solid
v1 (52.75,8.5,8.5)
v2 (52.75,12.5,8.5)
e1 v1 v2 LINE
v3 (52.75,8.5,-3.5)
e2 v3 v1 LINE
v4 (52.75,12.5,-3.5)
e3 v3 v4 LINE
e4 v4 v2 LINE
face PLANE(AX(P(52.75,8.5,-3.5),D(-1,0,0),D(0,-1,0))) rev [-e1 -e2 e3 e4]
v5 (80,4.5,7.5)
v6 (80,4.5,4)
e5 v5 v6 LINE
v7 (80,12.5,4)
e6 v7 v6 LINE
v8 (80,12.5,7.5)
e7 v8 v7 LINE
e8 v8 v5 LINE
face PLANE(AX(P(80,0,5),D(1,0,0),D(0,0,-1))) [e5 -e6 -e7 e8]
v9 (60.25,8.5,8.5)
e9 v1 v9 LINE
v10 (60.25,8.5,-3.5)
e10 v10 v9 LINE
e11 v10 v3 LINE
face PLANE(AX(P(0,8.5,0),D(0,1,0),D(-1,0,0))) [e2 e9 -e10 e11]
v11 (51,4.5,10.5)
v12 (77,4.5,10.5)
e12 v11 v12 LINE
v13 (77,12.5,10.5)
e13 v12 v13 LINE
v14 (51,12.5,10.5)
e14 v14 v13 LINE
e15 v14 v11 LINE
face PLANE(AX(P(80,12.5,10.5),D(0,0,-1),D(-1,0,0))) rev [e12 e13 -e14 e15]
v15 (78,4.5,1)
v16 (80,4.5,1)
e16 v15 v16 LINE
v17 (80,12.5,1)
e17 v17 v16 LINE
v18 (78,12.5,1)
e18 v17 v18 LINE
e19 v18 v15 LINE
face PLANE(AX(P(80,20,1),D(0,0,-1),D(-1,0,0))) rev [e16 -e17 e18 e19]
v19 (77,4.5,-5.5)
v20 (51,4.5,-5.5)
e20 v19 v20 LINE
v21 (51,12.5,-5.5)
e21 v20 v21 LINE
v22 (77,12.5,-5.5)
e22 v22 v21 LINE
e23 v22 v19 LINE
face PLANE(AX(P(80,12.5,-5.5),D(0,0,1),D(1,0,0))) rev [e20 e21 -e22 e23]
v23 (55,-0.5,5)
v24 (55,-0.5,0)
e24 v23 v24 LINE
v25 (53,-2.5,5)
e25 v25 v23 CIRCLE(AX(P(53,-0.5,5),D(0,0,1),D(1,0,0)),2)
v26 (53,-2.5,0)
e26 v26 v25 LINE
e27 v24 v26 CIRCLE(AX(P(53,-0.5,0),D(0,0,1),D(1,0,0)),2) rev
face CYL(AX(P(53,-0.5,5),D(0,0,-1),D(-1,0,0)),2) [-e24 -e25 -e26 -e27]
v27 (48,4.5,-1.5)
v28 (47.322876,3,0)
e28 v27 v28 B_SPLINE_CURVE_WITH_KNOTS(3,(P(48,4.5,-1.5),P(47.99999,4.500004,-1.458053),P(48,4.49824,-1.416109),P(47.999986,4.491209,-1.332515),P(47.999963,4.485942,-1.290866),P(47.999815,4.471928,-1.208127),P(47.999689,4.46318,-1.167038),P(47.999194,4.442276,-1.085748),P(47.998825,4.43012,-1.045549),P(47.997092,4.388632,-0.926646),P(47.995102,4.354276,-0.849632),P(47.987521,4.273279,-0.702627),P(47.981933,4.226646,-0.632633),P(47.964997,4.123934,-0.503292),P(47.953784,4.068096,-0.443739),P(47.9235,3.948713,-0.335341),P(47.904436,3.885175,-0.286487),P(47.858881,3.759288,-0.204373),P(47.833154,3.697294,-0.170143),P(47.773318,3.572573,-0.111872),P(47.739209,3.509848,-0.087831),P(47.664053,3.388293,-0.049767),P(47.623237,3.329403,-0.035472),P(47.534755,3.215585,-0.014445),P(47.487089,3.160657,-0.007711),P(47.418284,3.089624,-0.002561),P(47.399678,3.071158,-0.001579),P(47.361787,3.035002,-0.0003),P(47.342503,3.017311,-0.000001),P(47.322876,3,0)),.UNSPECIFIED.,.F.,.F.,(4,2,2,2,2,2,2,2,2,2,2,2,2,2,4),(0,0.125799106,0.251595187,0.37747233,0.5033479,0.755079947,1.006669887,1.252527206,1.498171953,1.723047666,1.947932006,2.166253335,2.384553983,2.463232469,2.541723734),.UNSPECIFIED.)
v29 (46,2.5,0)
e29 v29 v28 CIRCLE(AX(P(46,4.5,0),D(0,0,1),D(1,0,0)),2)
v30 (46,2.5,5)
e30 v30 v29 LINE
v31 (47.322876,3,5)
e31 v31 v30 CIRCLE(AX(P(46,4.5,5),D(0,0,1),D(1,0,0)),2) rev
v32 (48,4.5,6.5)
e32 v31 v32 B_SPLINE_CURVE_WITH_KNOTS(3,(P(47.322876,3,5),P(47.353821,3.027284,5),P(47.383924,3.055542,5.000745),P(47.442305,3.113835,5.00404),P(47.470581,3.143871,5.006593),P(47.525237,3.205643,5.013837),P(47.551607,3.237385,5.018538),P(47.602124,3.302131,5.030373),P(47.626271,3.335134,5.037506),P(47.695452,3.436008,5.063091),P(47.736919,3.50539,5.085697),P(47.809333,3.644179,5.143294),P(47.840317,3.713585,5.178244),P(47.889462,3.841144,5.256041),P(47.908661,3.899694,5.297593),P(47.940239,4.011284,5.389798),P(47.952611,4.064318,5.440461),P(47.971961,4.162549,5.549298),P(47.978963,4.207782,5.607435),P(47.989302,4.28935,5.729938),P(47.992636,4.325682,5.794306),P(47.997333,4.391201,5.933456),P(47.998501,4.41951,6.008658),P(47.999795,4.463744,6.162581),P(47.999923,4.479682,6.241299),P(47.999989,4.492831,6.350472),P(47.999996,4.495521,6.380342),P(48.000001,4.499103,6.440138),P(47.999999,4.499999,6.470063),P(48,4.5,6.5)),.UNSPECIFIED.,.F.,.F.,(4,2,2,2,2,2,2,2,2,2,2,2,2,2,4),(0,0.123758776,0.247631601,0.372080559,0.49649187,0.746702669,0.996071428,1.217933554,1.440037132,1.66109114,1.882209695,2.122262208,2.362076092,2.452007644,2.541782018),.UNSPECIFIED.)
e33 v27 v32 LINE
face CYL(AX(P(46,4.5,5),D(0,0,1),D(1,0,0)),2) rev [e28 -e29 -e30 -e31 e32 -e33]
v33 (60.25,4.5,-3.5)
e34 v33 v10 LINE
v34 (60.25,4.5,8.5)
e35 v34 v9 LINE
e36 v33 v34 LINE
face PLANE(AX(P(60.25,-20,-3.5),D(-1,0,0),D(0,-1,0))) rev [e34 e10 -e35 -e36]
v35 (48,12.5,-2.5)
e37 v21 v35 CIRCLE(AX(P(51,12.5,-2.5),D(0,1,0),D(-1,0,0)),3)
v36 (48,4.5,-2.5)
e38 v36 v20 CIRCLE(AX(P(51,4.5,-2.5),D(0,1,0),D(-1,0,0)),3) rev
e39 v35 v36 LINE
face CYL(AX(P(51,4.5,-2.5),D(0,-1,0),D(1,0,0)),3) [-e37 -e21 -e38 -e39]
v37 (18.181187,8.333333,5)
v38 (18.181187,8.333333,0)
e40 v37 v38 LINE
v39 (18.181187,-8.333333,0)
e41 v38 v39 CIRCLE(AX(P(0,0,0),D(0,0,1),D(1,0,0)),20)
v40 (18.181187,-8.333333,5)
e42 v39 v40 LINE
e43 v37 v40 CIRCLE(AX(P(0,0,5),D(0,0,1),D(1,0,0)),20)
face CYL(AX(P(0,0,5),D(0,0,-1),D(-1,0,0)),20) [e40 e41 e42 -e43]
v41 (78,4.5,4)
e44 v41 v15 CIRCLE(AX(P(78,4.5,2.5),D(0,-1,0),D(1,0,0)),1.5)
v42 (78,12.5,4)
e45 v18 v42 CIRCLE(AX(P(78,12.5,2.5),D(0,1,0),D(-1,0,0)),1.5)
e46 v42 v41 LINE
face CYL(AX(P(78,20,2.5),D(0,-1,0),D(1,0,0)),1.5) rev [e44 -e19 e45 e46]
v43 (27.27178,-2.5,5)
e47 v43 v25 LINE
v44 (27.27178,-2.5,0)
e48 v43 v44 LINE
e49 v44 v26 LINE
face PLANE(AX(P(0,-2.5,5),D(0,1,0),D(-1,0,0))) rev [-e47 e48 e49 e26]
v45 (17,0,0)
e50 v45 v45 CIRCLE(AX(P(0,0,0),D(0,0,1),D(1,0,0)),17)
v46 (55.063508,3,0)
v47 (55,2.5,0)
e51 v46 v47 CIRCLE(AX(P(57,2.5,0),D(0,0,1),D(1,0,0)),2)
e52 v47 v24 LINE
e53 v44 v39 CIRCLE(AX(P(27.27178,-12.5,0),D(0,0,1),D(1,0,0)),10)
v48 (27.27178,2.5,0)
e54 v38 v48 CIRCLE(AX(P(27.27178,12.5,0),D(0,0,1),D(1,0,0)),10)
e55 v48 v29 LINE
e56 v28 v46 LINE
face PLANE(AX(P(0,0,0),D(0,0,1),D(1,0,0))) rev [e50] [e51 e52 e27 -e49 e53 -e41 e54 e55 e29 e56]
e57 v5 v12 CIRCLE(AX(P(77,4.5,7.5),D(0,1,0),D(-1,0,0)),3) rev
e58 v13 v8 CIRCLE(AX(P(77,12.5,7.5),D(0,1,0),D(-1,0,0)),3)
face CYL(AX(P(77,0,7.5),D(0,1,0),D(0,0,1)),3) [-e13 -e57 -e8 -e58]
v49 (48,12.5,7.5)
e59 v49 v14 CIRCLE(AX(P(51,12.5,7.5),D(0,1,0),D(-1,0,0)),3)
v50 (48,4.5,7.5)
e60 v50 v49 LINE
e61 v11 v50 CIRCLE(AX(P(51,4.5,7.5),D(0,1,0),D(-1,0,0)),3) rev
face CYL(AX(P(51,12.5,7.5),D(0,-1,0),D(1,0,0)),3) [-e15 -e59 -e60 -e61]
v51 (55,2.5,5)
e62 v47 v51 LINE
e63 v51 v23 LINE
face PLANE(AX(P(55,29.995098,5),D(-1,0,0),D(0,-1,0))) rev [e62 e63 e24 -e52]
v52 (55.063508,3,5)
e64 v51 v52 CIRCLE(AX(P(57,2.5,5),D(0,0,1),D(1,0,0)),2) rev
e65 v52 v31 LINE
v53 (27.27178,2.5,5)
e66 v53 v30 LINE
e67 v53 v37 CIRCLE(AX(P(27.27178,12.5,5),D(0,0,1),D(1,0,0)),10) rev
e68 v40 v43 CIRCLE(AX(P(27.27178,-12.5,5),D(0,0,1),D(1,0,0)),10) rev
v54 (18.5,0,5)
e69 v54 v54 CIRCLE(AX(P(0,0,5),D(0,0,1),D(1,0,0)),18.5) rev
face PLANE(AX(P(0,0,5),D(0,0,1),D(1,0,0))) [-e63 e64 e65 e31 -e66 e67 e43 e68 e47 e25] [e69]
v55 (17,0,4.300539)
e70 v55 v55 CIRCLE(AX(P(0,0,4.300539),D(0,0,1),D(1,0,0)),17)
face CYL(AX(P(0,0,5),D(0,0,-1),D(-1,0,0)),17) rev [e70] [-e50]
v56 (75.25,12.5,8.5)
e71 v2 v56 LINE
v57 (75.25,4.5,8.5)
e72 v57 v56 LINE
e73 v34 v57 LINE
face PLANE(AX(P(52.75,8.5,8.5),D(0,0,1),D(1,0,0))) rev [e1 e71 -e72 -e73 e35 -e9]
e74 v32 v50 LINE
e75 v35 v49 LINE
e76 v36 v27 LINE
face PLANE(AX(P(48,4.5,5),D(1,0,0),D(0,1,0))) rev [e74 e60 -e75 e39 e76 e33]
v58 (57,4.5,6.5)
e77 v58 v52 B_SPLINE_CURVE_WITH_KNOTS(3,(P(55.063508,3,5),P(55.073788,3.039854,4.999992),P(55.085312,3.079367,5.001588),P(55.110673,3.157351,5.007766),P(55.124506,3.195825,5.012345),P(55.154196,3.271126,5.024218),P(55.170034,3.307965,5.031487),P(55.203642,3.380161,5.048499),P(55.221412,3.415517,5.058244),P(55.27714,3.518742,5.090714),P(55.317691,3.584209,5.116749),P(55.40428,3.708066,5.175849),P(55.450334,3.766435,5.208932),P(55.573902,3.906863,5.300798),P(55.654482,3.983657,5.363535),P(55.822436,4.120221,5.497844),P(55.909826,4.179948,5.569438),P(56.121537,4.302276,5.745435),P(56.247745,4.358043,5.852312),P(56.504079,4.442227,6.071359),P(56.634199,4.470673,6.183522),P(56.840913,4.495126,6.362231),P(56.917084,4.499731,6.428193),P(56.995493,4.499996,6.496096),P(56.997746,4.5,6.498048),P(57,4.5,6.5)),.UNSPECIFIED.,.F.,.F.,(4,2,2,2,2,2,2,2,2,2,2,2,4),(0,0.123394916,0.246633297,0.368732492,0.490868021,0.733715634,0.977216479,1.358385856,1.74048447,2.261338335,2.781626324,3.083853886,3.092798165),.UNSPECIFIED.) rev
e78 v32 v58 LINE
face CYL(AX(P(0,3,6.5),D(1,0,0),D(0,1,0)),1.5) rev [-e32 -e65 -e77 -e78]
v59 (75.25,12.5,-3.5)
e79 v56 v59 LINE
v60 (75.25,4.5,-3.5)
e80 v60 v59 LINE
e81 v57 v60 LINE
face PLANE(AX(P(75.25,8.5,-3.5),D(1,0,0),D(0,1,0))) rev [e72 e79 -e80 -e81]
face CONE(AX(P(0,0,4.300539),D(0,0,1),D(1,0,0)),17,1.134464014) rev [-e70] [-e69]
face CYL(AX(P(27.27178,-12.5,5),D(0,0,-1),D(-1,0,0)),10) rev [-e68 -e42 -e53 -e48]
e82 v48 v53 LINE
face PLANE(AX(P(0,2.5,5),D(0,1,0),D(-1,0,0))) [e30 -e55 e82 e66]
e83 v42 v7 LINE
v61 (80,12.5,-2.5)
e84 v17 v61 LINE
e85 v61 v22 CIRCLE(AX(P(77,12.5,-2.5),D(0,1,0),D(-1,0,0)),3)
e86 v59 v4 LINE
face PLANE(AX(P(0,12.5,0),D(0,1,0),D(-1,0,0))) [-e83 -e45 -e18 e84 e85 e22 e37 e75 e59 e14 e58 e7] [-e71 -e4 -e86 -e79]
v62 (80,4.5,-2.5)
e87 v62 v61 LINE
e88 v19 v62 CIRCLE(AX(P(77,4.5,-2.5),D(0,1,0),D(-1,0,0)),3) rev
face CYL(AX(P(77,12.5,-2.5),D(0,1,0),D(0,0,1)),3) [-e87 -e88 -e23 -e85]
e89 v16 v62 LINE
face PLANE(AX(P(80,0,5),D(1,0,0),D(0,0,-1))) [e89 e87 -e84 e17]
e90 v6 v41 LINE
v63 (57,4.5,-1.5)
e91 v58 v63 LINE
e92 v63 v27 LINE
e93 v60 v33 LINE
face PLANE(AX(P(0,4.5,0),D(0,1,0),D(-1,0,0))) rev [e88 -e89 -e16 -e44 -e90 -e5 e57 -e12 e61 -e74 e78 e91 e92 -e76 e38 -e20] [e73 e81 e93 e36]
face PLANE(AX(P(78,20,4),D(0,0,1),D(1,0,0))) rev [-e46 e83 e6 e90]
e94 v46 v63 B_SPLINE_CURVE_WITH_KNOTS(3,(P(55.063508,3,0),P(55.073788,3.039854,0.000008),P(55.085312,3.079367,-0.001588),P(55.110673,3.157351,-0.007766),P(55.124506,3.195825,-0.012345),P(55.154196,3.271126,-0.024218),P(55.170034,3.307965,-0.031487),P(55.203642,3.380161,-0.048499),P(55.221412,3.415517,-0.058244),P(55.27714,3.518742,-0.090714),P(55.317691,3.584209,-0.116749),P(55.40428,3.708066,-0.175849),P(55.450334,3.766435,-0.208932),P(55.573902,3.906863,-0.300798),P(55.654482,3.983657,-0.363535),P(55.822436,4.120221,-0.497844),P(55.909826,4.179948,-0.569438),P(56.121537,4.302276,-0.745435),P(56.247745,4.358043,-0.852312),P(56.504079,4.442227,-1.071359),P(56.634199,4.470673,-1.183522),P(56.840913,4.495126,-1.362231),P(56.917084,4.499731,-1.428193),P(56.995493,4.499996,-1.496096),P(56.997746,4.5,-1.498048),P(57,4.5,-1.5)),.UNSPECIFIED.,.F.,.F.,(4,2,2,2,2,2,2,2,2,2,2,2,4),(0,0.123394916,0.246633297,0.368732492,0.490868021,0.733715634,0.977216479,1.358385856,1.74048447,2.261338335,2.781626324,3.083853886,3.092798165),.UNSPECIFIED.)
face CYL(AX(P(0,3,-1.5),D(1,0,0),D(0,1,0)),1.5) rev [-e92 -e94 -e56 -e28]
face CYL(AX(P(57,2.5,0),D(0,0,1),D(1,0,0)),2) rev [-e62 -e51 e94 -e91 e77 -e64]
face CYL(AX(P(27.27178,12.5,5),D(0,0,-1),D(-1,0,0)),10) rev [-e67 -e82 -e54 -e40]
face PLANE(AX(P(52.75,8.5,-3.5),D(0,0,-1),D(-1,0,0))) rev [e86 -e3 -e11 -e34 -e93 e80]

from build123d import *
from build123d.topology import SkipClean

# Parameters (mm, degrees)
BOSS_EXTRUDE1_DEPTH = 5
CHAMFER2_SIZE       = 1.5
CHAMFER2_SIZE2      = 0.699461487
FILLET1_R           = 10
SKETCH10_W          = 32
SKETCH10_H          = 5
BOSS_EXTRUDE3_DEPTH = 2
SKETCH5_W           = 32
SKETCH5_H           = 16
BOSS_EXTRUDE2_DEPTH = 8
SKETCH6_W           = 22.5
SKETCH6_H           = 12
CUT_EXTRUDE1_DEPTH  = 4
SKETCH7_W           = 25
SKETCH7_H           = 5
CUT_EXTRUDE2_DEPTH  = 7
SKETCH8_W           = 15
SKETCH8_H           = 12
CUT_EXTRUDE3_DEPTH  = 86.571607441
CUT_EXTRUDE4_DEPTH  = 85.32378075
FILLET2_R           = 2
FILLET3_START       = 48
FILLET3_DEPTH       = 6.9999999
FILLET3_START_2     = 47.322875556
FILLET3_2_DEPTH     = 9.677124544
FILLET3_START_3     = -3
FILLET3_3_DEPTH     = 10
FILLET4_R           = 3


with BuildPart() as part:
    # Sketch1 → Boss-Extrude1 (new body)
    with BuildSketch(Plane.XY):
        with BuildLine():
            ThreePointArc((16.815171721, -2.5), (-17, 0), (16.815171721, 2.5))
            Line((16.815171721, 2.5), (19.843134833, 2.5))
            ThreePointArc((19.843134833, 2.5), (-20, 0), (19.843134833, -2.5))
            Line((19.843134833, -2.5), (16.815171721, -2.5))
        make_face()
        with BuildLine():
            Line((19.843134833, 2.5), (16.815171721, 2.5))
            ThreePointArc((16.815171721, 2.5), (16.953729962, 1.253411494), (17, 0))
            ThreePointArc((17, 0), (16.953729962, -1.253411494), (16.815171721, -2.5))
            Line((16.815171721, -2.5), (19.843134833, -2.5))
            ThreePointArc((19.843134833, -2.5), (19.960745185, -1.252458251), (20, 0))
            ThreePointArc((20, 0), (19.960745185, 1.252458251), (19.843134833, 2.5))
        make_face()
        with BuildLine():
            Line((80, 2.5), (19.843134833, 2.5))
            ThreePointArc((19.843134833, 2.5), (19.960745185, 1.252458251), (20, 0))
            ThreePointArc((20, 0), (19.960745185, -1.252458251), (19.843134833, -2.5))
            Line((19.843134833, -2.5), (80, -2.5))
            Line((80, -2.5), (80, 2.5))
        make_face()
    extrude(amount=BOSS_EXTRUDE1_DEPTH)

    # Chamfer2
    chamfer2_edges = [part.edges().sort_by_distance(p)[0] for p in [
        (-16.815171721, -2.5, 5),
    ]]
    chamfer2_side = [part.faces().sort_by_distance(p)[0] for p in [
        (23.12129627, 0, 5),
    ]]
    chamfer(chamfer2_edges, length=CHAMFER2_SIZE, length2=CHAMFER2_SIZE2, reference=chamfer2_side[0])

    # Fillet1
    fillet1_edges = [part.edges().sort_by_distance(p)[0] for p in [
        (19.843134833, 2.5, 2.5),
        (19.843134833, -2.5, 2.5),
    ]]
    fillet(fillet1_edges, radius=FILLET1_R)

    # Sketch10 → Boss-Extrude3 (add)
    with BuildSketch(Plane(origin=(0, 2.5, 0), x_dir=(1, 0, 0), z_dir=(0, 1, 0))):
        with Locations((64, -2.5)):
            Rectangle(SKETCH10_W, SKETCH10_H)
    extrude(amount=BOSS_EXTRUDE3_DEPTH)

    # Sketch5 → Boss-Extrude2 (add)
    with BuildSketch(Plane(origin=(0, 4.5, 0), x_dir=(1, 0, 0), z_dir=(0, 1, 0))):
        with Locations((64, -2.5)):
            Rectangle(SKETCH5_W, SKETCH5_H)
    extrude(amount=BOSS_EXTRUDE2_DEPTH)

    # Sketch6 → Cut-Extrude1 (cut)
    with BuildSketch(Plane(origin=(0, 12.5, 0), x_dir=(1, 0, 0), z_dir=(0, 1, 0))):
        with Locations((64, -2.5)):
            Rectangle(SKETCH6_W, SKETCH6_H)
    extrude(amount=-CUT_EXTRUDE1_DEPTH, mode=Mode.SUBTRACT)

    # Sketch7 → Cut-Extrude2 (cut)
    with BuildSketch(Plane.XZ.offset(2.5)):
        with Locations((67.5, 2.5)):
            Rectangle(SKETCH7_W, SKETCH7_H)
    extrude(amount=-CUT_EXTRUDE2_DEPTH, mode=Mode.SUBTRACT)

    # Sketch8 → Cut-Extrude3 (cut, through all)
    with BuildSketch(Plane(origin=(0, 8.5, 0), x_dir=(1, 0, 0), z_dir=(0, 1, 0))):
        with Locations((67.75, -2.5)):
            Rectangle(SKETCH8_W, SKETCH8_H)
    extrude(amount=-CUT_EXTRUDE3_DEPTH, mode=Mode.SUBTRACT)

    # Sketch9 → Cut-Extrude4 (cut, through all)
    with BuildSketch(Plane.XZ.offset(-4.5)):
        with BuildLine():
            Line((78, 4), (80, 4))
            Line((80, 4), (80, 1))
            Line((80, 1), (78, 1))
            ThreePointArc((78, 1), (76.5, 2.5), (78, 4))
        make_face()
    extrude(amount=-CUT_EXTRUDE4_DEPTH, mode=Mode.SUBTRACT)

    # Fillet2
    fillet2_edges = [part.edges().sort_by_distance(p)[0] for p in [
        (55, 4.5, 2.5),
        (48, 2.5, 2.5),
        (55, -2.5, 2.5),
    ]]
    fillet(fillet2_edges, radius=FILLET2_R)

    # Fillet3: read off the stored shape, not the designer's step
    # Fillet3 outline → Fillet3 (add)
    with BuildSketch(Plane.YZ.offset(FILLET3_START)):
        with BuildLine():
            Line((4.5, -1.5), (4.5, 0))
            Line((4.5, 0), (3, 0))
            ThreePointArc((3, 0), (4.060660172, -0.439339828), (4.5, -1.5))
        make_face()
        with BuildLine():
            ThreePointArc((4.5, 6.5), (4.060660172, 5.439339828), (3, 5))
            Line((3, 5), (4.5, 5))
            Line((4.5, 5), (4.5, 6.5))
        make_face()
    extrude(amount=FILLET3_DEPTH)

    # Fillet3 2 outline → Fillet3 2 (add)
    with BuildSketch(Plane.YZ.offset(FILLET3_START_2)):
        with BuildLine():
            Line((4.5, -1.5), (4.5, 0))
            Line((4.5, 0), (3, 0))
            ThreePointArc((3, 0), (4.060660172, -0.439339828), (4.5, -1.5))
        make_face()
        with BuildLine():
            ThreePointArc((4.5, 6.5), (4.060660172, 5.439339828), (3, 5))
            Line((3, 5), (4.5, 5))
            Line((4.5, 5), (4.5, 6.5))
        make_face()
    extrude(amount=FILLET3_2_DEPTH)

    # Fillet3 3 outline → Fillet3 3 (cut)
    with SkipClean():  # the faces are left unmerged after this step: merging them gives an invalid solid
        with BuildSketch(Plane.XY.offset(FILLET3_START_3)):
            with BuildLine():
                Line((47.322875556, 4.5), (47.3228756, 2.999999951))
                ThreePointArc((47.3228756, 2.999999951), (47.82287564, 3.67712431), (48, 4.5))
                Line((48, 4.5), (47.322875556, 4.5))
            make_face()
            with BuildLine():
                ThreePointArc((57, 4.5), (55.775255129, 4.08113883), (55.063508327, 3))
                Line((55.063508327, 3), (57.0000001, 3))
                Line((57.0000001, 3), (57, 4.5))
            make_face()
        extrude(amount=FILLET3_3_DEPTH, mode=Mode.SUBTRACT)
    add(part.part.scale(1), mode=Mode.REPLACE)  # the faces are merged on a copy

    # Fillet4
    fillet4_edges = [part.edges().sort_by_distance(p)[0] for p in [
        (80, 8.5, 10.5),
        (80, 8.5, -5.5),
        (48, 8.5, -5.5),
        (48, 8.5, 10.5),
    ]]
    fillet(fillet4_edges, radius=FILLET4_R)


solid = part.part
